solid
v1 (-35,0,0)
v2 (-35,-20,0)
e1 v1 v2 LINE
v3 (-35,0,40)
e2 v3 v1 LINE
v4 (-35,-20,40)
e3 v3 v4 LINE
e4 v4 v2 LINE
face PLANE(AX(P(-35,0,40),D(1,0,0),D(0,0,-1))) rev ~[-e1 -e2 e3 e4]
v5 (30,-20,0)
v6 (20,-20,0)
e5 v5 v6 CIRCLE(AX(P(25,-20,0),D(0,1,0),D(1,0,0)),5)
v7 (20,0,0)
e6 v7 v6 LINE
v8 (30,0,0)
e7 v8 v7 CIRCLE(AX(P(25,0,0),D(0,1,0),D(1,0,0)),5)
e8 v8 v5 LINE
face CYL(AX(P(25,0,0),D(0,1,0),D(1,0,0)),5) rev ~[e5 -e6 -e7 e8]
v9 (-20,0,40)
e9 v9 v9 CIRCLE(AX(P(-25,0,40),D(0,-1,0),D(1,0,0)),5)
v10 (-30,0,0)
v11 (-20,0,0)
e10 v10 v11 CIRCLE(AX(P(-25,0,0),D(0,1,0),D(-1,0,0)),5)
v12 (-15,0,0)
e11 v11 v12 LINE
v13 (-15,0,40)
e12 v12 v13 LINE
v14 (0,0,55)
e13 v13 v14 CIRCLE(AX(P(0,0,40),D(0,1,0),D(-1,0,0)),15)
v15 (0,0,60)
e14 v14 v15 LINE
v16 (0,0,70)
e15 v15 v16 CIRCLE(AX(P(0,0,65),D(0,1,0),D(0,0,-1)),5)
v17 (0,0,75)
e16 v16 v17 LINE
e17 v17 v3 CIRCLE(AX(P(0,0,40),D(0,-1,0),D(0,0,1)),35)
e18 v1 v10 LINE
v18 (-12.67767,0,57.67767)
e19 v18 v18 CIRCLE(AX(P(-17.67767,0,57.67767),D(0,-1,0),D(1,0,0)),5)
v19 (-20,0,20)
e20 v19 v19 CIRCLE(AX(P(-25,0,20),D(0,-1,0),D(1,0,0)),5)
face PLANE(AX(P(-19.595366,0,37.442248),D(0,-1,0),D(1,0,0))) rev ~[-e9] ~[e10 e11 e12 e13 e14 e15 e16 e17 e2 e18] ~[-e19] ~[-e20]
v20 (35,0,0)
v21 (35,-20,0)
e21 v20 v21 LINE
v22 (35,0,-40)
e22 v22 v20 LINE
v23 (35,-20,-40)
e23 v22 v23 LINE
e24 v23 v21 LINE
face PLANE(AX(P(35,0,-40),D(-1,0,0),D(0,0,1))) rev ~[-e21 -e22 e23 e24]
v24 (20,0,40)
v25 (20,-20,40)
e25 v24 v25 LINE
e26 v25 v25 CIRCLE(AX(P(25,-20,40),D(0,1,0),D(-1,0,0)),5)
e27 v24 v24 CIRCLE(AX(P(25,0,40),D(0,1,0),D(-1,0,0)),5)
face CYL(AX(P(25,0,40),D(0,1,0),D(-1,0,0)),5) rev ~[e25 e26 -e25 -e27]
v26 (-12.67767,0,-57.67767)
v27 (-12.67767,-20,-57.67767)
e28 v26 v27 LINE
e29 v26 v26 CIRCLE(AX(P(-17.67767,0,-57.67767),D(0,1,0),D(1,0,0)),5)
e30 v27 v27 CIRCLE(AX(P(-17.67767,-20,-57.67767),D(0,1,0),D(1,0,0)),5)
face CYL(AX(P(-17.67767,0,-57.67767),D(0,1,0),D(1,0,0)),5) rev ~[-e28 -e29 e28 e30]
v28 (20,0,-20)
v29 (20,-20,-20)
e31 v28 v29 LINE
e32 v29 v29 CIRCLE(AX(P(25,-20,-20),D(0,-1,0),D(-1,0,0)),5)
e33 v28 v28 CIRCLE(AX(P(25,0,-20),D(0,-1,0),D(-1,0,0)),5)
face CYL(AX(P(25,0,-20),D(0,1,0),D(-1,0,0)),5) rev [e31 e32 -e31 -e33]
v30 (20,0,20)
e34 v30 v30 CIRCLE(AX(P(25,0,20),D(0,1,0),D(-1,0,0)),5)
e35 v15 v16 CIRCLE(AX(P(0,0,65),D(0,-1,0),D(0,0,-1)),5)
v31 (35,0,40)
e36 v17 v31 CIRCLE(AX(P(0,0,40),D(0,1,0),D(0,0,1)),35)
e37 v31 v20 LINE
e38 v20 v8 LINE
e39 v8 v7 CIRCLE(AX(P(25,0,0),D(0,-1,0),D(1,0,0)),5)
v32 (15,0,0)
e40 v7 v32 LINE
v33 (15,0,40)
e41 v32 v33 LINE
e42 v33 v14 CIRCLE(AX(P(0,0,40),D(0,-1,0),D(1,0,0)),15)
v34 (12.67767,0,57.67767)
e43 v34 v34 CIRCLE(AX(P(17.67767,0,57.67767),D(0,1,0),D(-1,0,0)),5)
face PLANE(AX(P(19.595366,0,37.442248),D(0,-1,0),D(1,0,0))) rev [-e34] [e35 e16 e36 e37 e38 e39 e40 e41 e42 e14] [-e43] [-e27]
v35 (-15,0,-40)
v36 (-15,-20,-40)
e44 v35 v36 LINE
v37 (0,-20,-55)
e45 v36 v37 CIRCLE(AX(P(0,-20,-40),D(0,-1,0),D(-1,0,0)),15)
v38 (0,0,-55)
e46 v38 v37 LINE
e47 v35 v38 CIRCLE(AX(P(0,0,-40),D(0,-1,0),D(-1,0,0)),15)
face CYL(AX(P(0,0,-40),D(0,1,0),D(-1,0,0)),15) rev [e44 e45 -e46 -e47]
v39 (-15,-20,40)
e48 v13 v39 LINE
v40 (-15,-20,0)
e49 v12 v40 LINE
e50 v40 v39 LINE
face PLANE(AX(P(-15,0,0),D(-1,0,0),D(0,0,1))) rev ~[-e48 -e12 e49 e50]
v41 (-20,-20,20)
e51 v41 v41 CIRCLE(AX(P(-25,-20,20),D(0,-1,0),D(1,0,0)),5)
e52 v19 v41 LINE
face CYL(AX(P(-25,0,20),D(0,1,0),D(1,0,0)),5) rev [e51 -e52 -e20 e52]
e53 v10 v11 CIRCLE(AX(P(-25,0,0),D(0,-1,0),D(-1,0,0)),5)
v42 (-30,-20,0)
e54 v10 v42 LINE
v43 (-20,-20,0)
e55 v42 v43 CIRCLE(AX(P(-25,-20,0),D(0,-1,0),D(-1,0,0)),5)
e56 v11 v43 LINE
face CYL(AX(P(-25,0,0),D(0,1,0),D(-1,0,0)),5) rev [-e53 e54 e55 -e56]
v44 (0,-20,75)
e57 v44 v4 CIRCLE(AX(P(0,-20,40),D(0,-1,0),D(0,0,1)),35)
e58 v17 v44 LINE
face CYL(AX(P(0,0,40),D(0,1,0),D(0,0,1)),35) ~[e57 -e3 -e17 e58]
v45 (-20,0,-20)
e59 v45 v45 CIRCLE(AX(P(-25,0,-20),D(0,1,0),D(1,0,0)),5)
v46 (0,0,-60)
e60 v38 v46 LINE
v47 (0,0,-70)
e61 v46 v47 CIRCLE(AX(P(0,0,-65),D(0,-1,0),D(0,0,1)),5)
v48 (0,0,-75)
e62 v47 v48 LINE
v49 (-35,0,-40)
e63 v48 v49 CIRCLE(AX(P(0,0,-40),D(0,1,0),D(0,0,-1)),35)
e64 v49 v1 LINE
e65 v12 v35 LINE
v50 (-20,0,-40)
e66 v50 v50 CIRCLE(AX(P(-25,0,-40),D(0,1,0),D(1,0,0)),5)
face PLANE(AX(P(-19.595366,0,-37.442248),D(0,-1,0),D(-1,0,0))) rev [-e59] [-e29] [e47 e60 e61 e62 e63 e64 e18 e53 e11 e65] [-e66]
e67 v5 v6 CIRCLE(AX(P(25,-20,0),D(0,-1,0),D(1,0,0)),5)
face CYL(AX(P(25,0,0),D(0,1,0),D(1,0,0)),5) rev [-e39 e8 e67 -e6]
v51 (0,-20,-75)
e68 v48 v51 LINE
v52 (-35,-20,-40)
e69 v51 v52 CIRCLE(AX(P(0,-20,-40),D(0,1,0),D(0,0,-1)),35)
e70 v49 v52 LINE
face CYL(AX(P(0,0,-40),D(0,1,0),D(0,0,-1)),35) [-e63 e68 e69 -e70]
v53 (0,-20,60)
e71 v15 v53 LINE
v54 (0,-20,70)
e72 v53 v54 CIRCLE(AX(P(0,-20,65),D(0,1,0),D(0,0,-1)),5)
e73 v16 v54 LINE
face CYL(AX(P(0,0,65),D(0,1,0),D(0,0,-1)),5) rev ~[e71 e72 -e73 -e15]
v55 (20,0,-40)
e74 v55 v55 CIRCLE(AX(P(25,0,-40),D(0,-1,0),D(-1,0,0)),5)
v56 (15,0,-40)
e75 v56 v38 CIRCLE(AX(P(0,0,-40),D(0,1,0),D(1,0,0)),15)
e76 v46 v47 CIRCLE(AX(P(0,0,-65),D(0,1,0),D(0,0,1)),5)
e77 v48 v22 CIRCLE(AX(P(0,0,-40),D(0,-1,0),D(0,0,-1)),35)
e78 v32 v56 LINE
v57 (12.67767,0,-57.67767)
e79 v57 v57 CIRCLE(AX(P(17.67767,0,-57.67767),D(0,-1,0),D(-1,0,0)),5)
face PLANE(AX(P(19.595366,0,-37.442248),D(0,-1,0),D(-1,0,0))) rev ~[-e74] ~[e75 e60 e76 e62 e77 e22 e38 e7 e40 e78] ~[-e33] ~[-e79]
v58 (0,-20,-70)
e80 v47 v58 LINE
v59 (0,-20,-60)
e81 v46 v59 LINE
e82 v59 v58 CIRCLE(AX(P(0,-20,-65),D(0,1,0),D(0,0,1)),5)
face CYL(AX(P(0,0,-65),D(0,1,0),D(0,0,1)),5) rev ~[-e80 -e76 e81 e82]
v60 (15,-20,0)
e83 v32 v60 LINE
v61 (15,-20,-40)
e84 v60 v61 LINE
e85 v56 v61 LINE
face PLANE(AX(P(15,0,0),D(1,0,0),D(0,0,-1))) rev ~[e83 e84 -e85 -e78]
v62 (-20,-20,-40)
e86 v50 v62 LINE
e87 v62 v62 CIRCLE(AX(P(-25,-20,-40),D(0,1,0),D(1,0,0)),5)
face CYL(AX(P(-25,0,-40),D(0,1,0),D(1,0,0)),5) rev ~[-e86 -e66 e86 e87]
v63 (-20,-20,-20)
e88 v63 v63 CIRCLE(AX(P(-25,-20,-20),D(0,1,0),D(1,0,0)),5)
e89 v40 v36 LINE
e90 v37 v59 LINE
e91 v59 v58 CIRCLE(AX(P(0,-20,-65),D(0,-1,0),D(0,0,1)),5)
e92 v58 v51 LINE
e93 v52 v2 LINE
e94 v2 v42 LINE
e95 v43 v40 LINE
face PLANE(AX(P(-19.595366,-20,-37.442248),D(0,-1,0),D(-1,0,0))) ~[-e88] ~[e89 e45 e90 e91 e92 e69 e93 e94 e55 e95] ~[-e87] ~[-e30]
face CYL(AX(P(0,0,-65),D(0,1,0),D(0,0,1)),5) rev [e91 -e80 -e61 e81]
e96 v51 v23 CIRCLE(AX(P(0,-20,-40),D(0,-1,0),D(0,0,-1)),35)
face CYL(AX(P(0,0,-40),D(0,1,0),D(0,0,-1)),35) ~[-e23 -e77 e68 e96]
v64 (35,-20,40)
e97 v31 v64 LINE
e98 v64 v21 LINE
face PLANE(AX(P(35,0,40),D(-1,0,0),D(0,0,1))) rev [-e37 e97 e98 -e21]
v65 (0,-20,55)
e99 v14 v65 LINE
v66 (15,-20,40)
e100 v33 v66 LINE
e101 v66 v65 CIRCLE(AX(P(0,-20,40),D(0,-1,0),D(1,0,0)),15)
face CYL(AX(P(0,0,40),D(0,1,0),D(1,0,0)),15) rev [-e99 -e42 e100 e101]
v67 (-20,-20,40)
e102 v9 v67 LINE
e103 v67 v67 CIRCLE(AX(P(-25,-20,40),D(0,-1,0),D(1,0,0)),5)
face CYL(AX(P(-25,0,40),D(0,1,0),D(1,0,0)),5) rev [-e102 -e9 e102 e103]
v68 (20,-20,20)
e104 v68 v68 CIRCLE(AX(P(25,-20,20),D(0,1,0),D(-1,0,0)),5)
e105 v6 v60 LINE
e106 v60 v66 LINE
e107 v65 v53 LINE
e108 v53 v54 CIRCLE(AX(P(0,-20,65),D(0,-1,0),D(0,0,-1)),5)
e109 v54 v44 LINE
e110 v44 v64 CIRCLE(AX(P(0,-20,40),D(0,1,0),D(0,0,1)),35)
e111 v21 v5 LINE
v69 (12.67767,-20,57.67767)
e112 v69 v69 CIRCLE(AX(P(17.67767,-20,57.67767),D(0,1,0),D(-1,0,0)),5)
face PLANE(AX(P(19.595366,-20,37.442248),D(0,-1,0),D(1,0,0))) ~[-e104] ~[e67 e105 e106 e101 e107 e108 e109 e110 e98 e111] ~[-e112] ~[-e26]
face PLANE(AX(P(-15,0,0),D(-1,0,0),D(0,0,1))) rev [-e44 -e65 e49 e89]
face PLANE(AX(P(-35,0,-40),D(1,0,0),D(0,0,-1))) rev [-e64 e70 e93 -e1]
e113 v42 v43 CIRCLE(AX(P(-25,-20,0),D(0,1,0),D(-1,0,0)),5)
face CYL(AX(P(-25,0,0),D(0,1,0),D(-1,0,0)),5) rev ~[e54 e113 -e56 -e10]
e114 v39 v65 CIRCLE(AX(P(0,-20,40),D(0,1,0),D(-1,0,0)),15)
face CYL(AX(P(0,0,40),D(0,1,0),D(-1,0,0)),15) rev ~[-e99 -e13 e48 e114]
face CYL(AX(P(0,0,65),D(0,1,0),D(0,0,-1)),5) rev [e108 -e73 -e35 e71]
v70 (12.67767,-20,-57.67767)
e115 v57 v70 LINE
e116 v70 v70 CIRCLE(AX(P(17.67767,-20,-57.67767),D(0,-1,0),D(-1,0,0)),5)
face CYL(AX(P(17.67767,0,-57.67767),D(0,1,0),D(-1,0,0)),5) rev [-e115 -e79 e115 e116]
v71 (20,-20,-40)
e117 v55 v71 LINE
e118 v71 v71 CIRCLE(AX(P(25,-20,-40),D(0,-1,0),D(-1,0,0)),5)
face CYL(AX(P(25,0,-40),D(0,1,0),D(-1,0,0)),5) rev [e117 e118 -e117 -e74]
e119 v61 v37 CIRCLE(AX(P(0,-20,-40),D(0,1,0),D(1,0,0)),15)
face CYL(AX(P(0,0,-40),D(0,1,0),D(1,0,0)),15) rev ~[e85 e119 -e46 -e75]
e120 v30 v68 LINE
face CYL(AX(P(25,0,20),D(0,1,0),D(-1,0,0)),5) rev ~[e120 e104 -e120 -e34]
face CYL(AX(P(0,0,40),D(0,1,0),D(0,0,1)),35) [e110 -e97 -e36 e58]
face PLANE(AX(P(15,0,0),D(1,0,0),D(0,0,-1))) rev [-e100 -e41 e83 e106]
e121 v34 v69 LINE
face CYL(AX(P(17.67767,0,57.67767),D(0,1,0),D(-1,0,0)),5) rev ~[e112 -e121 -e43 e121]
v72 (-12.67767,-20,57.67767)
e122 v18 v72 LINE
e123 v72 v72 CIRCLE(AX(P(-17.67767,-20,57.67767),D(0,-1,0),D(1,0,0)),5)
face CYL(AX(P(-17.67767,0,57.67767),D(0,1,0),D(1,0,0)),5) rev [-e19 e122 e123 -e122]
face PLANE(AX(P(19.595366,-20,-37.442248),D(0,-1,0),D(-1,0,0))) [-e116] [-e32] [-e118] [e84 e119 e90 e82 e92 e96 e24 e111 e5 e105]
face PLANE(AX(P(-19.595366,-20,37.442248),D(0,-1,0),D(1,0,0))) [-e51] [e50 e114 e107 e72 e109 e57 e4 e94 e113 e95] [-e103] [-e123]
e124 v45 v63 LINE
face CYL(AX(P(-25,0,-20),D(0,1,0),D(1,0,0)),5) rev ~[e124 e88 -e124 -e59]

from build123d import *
from build123d import SkipClean  # not in build123d's __all__

# Parameters (mm, degrees)
F0_R     = 5
F1_DEPTH = 20


with BuildPart() as f1:
    # F0 (on Front) → F1 (new body)
    with BuildSketch(Plane.XZ):
        with BuildLine():
            Line((-15, 0), (-15, 40))
            ThreePointArc((-15, 40), (-10.6066017178, 50.6066017178), (0, 55))
            Line((0, 55), (0, 60))
            ThreePointArc((0, 60), (-5, 65), (0, 70))
            Line((0, 70), (0, 75))
            ThreePointArc((0, 75), (-24.7487373415, 64.7487373415), (-35, 40))
            Line((-35, 40), (-35, 0))
            Line((-35, 0), (-30, 0))
            ThreePointArc((-30, 0), (-25, 5), (-20, 0))
            Line((-20, 0), (-15, 0))
        make_face()
        with Locations((-25, 20)):
            Circle(F0_R, mode=Mode.SUBTRACT)
        with Locations((-25, 40)):
            Circle(F0_R, mode=Mode.SUBTRACT)
        with Locations((-17.6776695297, 57.6776695297)):
            Circle(F0_R, mode=Mode.SUBTRACT)
    extrude(amount=F1_DEPTH)

    # F2: F1 across plane


with BuildPart() as f1_1:
    add(f1.part, clean=False)
    with SkipClean():  # cleaning this boolean's faces spoils the solid; the shape is the same uncleaned
        add(f1.part.mirror(Plane.YZ), clean=False)

    # F3: F1 across plane


with BuildPart() as f1_2:
    add(f1_1.part, clean=False)
    with SkipClean():  # cleaning this boolean's faces spoils the solid; the shape is the same uncleaned
        add(f1_1.part.mirror(Plane.XY), clean=False)


solid = f1_2.part
